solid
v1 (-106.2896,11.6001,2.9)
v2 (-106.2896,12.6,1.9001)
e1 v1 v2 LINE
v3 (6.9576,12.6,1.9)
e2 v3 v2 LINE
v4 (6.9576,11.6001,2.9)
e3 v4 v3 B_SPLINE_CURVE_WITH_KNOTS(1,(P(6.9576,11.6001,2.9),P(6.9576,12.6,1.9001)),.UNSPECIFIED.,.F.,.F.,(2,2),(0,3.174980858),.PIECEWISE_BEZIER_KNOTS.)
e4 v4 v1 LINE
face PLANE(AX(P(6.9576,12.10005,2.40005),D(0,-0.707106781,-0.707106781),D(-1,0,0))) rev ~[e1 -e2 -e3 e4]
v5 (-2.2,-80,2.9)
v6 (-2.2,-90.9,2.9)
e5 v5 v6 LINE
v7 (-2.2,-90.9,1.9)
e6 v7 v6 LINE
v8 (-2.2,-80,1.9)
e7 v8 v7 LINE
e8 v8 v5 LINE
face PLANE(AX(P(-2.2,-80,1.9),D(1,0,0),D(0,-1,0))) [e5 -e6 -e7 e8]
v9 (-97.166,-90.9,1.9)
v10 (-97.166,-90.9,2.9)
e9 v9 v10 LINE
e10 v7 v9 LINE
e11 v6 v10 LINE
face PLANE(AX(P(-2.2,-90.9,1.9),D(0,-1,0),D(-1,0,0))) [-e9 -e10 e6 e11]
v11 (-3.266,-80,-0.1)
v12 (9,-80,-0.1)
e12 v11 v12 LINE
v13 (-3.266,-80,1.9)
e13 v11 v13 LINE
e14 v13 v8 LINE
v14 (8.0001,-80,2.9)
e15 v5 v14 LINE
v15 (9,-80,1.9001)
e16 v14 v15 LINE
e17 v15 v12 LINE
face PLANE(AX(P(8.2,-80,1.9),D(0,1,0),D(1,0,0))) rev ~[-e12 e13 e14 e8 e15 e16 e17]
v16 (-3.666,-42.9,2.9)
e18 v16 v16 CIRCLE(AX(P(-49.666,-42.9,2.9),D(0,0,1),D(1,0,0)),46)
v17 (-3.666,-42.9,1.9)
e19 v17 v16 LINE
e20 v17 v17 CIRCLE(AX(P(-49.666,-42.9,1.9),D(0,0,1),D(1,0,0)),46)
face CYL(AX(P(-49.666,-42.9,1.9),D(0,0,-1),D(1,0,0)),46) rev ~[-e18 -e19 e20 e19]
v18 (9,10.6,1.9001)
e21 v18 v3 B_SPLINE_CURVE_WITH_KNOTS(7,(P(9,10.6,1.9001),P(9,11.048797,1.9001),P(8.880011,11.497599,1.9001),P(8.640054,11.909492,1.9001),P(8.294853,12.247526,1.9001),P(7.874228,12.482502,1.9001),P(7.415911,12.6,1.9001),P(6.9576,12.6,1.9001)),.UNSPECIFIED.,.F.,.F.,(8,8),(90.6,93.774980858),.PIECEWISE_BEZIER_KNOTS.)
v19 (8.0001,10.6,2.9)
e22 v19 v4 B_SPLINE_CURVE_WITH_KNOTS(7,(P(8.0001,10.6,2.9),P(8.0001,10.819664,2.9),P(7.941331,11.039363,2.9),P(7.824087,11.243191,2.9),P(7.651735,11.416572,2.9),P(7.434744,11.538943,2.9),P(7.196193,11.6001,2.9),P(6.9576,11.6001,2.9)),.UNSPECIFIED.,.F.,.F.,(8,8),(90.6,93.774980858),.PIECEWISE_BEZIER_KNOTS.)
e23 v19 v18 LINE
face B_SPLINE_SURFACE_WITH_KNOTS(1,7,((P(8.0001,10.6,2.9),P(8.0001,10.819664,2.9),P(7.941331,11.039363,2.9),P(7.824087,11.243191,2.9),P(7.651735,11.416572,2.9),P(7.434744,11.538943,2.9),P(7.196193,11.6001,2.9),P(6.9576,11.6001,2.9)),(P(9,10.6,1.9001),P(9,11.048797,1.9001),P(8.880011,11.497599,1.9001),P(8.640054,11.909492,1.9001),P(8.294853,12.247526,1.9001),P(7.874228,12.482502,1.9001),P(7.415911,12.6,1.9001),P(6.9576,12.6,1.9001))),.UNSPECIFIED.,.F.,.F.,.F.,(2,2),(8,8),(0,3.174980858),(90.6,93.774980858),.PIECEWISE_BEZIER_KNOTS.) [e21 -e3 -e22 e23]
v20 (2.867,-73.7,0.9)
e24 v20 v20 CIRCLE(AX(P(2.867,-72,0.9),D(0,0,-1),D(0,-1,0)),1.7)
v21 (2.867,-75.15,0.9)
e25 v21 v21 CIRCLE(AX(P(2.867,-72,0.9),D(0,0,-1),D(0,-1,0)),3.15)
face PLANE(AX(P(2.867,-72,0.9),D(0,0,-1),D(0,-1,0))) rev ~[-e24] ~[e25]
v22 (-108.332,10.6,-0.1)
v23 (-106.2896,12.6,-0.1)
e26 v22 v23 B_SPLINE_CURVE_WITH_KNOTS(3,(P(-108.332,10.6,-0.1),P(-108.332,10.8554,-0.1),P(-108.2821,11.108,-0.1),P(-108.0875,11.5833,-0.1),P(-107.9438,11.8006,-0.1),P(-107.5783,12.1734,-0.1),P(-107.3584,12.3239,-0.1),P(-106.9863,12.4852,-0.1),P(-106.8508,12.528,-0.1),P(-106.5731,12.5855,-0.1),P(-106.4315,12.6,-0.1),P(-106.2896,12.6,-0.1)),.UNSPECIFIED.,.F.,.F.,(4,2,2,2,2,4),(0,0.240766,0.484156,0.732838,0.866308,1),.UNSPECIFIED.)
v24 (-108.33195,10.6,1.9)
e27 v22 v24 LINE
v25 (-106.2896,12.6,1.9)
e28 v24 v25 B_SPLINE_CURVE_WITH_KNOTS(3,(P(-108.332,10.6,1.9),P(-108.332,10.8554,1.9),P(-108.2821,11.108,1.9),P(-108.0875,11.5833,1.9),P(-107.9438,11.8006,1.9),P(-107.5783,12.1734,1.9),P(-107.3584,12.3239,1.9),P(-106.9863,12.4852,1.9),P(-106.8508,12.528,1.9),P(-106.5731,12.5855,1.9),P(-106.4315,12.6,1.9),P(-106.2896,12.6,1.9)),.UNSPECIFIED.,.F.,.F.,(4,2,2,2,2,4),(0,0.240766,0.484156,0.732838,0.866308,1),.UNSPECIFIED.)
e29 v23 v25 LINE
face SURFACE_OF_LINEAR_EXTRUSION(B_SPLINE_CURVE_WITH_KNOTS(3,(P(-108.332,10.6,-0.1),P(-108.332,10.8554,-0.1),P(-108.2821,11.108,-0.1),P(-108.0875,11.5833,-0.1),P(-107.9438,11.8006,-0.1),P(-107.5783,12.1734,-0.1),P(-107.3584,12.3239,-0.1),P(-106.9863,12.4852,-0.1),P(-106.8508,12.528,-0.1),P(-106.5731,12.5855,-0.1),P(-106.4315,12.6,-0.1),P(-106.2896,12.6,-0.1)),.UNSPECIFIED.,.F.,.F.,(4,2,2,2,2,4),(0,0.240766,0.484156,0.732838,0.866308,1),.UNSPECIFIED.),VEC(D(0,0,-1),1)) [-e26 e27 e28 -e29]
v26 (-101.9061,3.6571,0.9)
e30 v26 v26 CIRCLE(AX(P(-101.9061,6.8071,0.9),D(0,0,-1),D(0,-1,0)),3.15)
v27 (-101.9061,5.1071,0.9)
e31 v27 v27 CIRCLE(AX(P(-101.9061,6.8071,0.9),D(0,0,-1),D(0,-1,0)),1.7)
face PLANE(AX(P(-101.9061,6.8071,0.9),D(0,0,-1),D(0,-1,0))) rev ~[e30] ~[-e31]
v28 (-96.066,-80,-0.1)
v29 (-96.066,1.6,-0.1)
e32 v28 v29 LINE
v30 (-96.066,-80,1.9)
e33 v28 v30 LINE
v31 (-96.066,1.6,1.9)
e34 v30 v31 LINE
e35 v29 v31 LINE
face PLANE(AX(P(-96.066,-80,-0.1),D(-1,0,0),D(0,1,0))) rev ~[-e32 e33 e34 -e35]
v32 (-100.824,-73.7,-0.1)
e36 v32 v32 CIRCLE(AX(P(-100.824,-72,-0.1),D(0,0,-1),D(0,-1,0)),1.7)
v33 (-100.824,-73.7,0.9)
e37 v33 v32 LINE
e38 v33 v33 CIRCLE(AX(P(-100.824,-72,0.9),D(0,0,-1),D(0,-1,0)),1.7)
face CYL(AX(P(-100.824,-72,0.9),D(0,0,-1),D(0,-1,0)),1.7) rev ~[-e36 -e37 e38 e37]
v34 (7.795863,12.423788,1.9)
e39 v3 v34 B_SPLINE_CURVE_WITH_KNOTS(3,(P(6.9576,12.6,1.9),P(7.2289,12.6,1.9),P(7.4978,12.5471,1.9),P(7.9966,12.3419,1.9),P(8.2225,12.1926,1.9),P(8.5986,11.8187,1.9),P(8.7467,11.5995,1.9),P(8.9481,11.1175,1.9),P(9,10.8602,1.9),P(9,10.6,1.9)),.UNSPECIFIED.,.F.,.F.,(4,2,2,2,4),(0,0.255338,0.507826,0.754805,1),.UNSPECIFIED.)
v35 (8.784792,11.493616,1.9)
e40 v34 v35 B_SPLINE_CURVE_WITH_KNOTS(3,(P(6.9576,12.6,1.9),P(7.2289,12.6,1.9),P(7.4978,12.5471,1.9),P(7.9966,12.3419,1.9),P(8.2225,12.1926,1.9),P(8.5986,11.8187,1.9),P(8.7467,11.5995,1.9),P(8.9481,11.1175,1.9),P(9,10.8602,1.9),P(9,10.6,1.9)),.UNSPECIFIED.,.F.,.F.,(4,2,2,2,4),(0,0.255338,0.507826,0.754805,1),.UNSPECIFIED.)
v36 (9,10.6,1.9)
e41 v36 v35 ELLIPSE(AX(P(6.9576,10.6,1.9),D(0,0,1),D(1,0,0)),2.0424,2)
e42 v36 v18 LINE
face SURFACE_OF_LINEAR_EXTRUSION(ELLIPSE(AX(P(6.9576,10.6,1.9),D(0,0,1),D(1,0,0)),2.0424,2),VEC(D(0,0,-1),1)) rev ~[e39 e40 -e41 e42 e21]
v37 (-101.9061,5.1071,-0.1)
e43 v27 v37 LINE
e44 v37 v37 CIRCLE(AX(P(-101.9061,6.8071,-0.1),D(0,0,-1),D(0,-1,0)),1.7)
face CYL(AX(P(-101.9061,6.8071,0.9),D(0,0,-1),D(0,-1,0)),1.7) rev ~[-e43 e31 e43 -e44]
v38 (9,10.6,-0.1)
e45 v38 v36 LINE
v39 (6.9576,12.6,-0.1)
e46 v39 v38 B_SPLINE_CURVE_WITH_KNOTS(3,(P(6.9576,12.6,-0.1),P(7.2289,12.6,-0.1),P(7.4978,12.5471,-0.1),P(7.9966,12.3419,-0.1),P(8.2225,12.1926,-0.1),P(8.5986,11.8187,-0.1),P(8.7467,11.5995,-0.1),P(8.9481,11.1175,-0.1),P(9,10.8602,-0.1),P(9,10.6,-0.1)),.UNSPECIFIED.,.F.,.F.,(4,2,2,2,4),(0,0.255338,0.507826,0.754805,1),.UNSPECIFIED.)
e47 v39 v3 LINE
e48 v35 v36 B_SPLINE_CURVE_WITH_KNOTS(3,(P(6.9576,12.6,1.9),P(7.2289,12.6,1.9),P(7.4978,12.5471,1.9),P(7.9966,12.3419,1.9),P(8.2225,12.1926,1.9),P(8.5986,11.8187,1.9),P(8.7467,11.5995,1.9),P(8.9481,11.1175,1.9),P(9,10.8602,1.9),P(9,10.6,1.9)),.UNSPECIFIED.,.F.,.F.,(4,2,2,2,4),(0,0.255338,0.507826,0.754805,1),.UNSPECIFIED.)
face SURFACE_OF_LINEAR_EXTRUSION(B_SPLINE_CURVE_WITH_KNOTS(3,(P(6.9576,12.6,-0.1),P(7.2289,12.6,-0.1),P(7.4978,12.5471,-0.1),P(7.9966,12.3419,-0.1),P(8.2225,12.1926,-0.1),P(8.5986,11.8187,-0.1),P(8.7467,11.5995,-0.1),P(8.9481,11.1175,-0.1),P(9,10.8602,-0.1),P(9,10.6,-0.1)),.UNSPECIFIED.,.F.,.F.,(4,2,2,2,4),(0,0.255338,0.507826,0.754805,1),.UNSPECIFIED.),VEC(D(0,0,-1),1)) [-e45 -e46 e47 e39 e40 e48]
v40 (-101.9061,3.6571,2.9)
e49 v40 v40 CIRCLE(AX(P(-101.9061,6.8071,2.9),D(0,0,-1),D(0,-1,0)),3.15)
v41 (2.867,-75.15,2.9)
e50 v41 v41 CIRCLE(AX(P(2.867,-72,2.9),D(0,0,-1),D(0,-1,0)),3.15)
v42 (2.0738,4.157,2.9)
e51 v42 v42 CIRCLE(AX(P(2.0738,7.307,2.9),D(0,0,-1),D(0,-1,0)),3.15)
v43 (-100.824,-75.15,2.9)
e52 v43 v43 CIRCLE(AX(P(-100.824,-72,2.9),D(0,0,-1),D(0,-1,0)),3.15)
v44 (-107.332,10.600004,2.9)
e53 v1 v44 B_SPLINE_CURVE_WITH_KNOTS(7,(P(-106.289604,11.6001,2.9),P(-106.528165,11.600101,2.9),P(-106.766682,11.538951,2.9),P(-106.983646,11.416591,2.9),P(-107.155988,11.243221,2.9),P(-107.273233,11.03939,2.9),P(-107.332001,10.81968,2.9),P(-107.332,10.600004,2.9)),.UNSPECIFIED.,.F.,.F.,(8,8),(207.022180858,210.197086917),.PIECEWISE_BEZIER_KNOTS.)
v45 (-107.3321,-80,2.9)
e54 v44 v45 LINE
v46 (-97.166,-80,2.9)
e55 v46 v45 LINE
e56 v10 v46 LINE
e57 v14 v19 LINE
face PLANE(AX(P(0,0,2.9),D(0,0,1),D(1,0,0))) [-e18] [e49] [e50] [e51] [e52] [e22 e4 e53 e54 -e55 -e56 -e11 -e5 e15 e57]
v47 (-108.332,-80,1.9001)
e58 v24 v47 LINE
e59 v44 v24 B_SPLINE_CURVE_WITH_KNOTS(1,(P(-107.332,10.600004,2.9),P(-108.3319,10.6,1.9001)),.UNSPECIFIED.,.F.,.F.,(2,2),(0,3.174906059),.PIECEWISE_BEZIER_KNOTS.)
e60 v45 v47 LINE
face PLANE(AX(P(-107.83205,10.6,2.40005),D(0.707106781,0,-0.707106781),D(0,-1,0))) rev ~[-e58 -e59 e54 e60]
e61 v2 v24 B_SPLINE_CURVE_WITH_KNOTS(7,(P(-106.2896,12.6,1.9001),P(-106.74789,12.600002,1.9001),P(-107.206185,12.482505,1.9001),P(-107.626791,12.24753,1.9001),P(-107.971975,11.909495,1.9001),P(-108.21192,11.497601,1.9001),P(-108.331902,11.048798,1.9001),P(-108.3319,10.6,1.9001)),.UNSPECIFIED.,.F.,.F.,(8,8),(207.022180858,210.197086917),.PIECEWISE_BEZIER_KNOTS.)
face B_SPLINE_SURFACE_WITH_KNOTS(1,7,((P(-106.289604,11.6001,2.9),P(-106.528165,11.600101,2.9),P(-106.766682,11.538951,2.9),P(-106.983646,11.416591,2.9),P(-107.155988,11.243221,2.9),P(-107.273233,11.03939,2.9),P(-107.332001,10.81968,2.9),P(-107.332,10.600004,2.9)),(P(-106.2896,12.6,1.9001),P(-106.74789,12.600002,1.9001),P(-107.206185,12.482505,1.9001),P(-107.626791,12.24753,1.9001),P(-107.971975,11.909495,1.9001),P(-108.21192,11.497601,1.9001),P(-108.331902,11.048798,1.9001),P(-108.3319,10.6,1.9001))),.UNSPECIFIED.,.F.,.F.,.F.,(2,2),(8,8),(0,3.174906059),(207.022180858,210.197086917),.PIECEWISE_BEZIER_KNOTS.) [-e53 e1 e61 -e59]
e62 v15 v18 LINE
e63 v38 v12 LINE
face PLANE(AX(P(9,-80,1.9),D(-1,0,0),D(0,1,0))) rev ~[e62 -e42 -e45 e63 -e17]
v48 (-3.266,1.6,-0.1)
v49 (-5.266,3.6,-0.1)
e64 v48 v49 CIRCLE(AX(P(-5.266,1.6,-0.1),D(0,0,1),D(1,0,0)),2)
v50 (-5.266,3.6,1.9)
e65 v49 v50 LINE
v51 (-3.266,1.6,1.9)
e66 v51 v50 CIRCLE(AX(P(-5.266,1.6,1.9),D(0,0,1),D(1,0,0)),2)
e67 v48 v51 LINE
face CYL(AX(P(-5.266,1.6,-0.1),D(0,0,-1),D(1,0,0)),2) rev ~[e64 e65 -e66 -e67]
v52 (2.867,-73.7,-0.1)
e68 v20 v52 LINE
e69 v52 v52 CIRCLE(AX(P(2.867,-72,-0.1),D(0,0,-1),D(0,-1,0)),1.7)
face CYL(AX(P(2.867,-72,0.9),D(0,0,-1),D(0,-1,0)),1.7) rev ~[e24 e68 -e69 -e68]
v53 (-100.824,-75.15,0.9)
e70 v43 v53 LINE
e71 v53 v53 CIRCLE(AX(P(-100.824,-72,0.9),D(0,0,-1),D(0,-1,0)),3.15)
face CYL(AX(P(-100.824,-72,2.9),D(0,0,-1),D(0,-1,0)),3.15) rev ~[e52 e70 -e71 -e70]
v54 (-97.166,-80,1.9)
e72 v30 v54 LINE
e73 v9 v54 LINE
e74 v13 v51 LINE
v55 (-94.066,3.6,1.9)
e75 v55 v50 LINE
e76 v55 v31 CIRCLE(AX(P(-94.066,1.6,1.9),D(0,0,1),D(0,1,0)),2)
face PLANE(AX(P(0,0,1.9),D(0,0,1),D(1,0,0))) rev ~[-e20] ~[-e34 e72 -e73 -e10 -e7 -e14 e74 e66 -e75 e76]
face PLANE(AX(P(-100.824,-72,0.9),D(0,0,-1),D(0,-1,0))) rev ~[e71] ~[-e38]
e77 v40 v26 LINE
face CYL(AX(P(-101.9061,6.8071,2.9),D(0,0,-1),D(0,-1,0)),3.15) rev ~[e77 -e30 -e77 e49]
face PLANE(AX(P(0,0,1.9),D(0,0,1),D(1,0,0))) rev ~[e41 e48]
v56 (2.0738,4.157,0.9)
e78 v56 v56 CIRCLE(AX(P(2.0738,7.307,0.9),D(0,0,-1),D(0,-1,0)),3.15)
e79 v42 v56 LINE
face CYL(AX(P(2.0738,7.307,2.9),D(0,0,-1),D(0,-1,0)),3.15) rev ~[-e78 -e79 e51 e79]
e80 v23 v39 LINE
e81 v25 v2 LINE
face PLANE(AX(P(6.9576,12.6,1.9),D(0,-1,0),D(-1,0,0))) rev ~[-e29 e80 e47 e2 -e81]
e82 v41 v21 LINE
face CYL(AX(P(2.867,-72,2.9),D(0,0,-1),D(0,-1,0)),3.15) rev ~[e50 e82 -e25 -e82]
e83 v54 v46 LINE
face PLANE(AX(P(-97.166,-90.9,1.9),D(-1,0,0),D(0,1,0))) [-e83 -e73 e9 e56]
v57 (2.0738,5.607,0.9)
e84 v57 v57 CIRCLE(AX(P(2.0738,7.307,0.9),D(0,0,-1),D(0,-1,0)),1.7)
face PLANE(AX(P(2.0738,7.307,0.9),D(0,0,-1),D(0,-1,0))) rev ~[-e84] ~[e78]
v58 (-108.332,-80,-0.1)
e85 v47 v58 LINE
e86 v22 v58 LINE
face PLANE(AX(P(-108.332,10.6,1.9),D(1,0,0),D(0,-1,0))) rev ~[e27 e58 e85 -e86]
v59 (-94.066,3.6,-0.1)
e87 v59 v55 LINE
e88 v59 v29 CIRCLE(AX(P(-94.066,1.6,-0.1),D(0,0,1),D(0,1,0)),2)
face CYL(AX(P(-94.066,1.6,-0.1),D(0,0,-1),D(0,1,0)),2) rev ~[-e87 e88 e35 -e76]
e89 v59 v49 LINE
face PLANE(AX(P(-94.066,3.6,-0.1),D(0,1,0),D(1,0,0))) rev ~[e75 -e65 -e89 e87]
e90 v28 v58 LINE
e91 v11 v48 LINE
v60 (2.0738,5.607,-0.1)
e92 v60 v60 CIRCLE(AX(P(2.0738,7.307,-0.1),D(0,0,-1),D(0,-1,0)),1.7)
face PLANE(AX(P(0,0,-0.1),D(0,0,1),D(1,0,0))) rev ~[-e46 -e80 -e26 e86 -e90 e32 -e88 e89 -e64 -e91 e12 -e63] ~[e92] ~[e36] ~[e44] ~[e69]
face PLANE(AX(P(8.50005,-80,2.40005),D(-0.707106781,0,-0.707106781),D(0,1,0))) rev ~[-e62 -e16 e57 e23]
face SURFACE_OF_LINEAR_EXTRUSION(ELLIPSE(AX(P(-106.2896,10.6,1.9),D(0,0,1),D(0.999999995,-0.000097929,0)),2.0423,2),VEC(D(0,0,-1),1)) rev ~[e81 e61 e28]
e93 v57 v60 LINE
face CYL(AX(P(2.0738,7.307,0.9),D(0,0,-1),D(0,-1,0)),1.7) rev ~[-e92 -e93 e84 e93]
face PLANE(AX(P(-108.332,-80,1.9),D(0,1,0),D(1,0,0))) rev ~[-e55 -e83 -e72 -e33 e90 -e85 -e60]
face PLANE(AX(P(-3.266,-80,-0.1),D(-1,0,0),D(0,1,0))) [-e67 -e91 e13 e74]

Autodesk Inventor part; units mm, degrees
ref_plane "YZ Plane" through (0, 0, 0) normal (1, 0, 0) x (0, 1, 0)
ref_plane "XZ Plane" through (0, 0, 0) normal (0, 1, 0) x (-1, 0, 0)
ref_plane "XY Plane" through (0, 0, 0) normal (0, 0, 1) x (1, 0, 0)
ref_plane "Work Plane1" through (0, 0, -0.1) normal (0, 0, 1) x (1, 0, 0)
sketch "Sketch1" plane through (0, 0, -0.1) normal (0, 0, 1) x (1, 0, 0)
  circle A0 centre (-100.824, -72) radius 2
  circle A1 centre (2.867, -72) radius 2
  circle A2 centre (-101.9061, 6.8071) radius 2
  circle A3 centre (2.0738, 7.307) radius 2
  spline S0 degree 3 poles (-108.332, 10.6) (-108.332, 10.8554) (-108.2821, 11.108) (-108.0875, 11.5833) (-107.9438, 11.8006) (-107.5783, 12.1734) (-107.3584, 12.3239) (-106.9863, 12.4852) (-106.8508, 12.528) (-106.5731, 12.5855) (-106.4315, 12.6) (-106.2896, 12.6) knots 0 0 0 0 0.240766 0.240766 0.484156 0.484156 0.732838 0.732838 0.866308 0.866308 1 1 1 1
  line L0 (-108.332, 10.6) -> (-108.332, -80)
  line L1 (-96.066, -80) -> (-108.332, -80)
  line L2 (-96.066, -80) -> (-96.066, 1.6)
  arc A4 (-94.066, 3.6) -> (-96.066, 1.6) centre (-94.066, 1.6) ccw
  line L3 (-94.066, 3.6) -> (-5.266, 3.6)
  arc A5 (-3.266, 1.6) -> (-5.266, 3.6) centre (-5.266, 1.6) ccw
  line L4 (-3.266, -80) -> (-3.266, 1.6)
  line L5 (-3.266, -80) -> (9, -80)
  line L6 (9, 10.6) -> (9, -80)
  spline S1 degree 3 poles (6.9576, 12.6) (7.2289, 12.6) (7.4978, 12.5471) (7.9966, 12.3419) (8.2225, 12.1926) (8.5986, 11.8187) (8.7467, 11.5995) (8.9481, 11.1175) (9, 10.8602) (9, 10.6) knots 0 0 0 0 0.255338 0.255338 0.507826 0.507826 0.754805 0.754805 1 1 1 1
  line L7 (-106.2896, 12.6) -> (6.9576, 12.6)
  point P0 (0, 0)
extrude "Extrusion1" add sketch "Sketch1" along normal blind 2 contours A0 | A1 | A2 | A3 | S0 L7 S1 L6 L5 L4 A5 L3 A4 L2 L1 L0
sketch "Sketch2" plane through (0, 0, 1.9) normal (0, 0, 1) x (1, 0, 0)
  line L0 (9, -80) -> (9, 10.6) projected
  ellipse E0 centre (6.9576, 10.6) end of major axis (9, 10.6) minor radius 2 (9, 10.6) -> (6.9576, 12.6) ccw projected
  line L1 (6.9576, 12.6) -> (-106.2896, 12.6) projected
  ellipse E1 centre (-106.2896, 10.6) end of major axis (-104.2473, 10.5998) minor radius 2 (-106.2896, 12.6) -> (-108.332, 10.6) ccw projected
  line L2 (-108.332, 10.6) -> (-108.332, -80) projected
  line L3 (8.2, -80) -> (8.2, 10.6)
  line L4 (6.9576, 11.8) -> (-106.2896, 11.8)
  line L5 (-107.532, 10.6) -> (-107.532, -80)
  circle A0 centre (-49.666, -42.9) radius 0.5 projected
  circle A1 centre (-49.666, -42.9) radius 46
  line L6 (8.2, -80) -> (-2.2, -80)
  line L7 (-2.2, -80) -> (-2.2, -90.9)
  line L8 (-2.2, -90.9) -> (-97.166, -90.9)
  line L9 (-97.166, -90.9) -> (-97.166, -80)
  line L10 (-97.166, -80) -> (-107.532, -80)
  line L11 (-2, -97.7) -> (-2, -80.1) projected
  line L12 (-97.366, -97.7) -> (-97.366, -80.1) projected
  spline S0 degree 4 poles (8.2, 10.6) (8.1999, 10.8352) (8.1361, 11.0703) (7.879, 11.4945) (7.4469, 11.738) (7.2023, 11.8) (6.9576, 11.8) knots 0 0 0 0 0 0.490114 0.490114 1 1 1 1 1
  spline S1 degree 4 poles (-106.2896, 11.8) (-106.5343, 11.8) (-106.7789, 11.738) (-107.211, 11.4945) (-107.4681, 11.0703) (-107.5319, 10.8352) (-107.532, 10.6) knots 0 0 0 0 0 0.509886 0.509886 1 1 1 1 1
  point P0 (0, 0)
  point P1 (-96.066, -80)
  point P2 (-3.266, -80)
  dimension "d2" = 0.8
  dimension "d3" = 92
  dimension "d6" = 48
  dimension "d25" = 0.2
  dimension "d26" = 0.2
extrude "Extrusion2" add sketch "Sketch2" along normal blind 1 contours L6 L7 L8 L9 L10 L5 S1 L4 S0 L3
sketch "Sketch3" plane through (0, 0, 2.9) normal (0, 0, 1) x (1, 0, 0)
  circle A0 centre (2.0738, 7.307) radius 2 construction
  circle A1 centre (2.867, -72) radius 2 construction
  circle A2 centre (-100.824, -72) radius 2 construction
  circle A3 centre (-101.9061, 6.8071) radius 2 construction
  point P0 (0, 0)
hole "Hole1" at (2.0738, 7.307, 2.9) at (-101.9061, 6.8071, 2.9) at (-100.824, -72, 2.9) at (2.867, -72, 2.9) direction (0, 0, -1) diameter 3.4 end through all counterbore diameter 6.3 counterbore depth 2 clearance for "Flat Head Machine Screw" size "M3" standard "Ansi Metric M Profile"
sketch "Sketch4" plane through (0, 0, 1.9) normal (0, 0, 1) x (1, 0, 0)
  line L0 (8.2, 10.6) -> (8.2, -80) projected
  line L1 (8.2, -80) -> (9, -80) projected
  line L2 (9, -80) -> (9, 10.6) projected
  ellipse E0 centre (6.9576, 10.6) end of major axis (9, 10.6) minor radius 2 (9, 10.6) -> (6.9576, 12.6) ccw projected
  line L3 (6.9576, 12.6) -> (-106.2896, 12.6) projected
  ellipse E1 centre (-106.2896, 10.6) end of major axis (-104.2473, 10.5998) minor radius 2 (-106.2896, 12.6) -> (-108.332, 10.6) ccw projected
  line L4 (-108.332, 10.6) -> (-108.332, -80) projected
  line L5 (-108.332, -80) -> (-107.532, -80) projected
  line L6 (-107.532, -80) -> (-107.532, 10.6) projected
  ellipse E2 centre (-106.2908, 10.6011) end of major axis (-105.0496, 10.6165) minor radius 1.1989 (-106.2896, 11.8) -> (-107.532, 10.6) ccw projected
  line L7 (-106.2896, 11.8) -> (6.9576, 11.8) projected
  ellipse E3 centre (6.9588, 10.6011) end of major axis (8.1999, 10.5856) minor radius 1.1989 (8.2, 10.6) -> (6.9576, 11.8) ccw projected
  point P0 (0, 0)
extrude "Extrusion3" add sketch "Sketch4" along normal blind 1
chamfer "Chamfer1" distance 1 angle 45 5 edges at (-49.666, 12.6, 2.9) (-107.7338, 12.0142, 2.9) (-108.332, -34.7, 2.9) (8.4018, 12.0142, 2.9) (9, -34.7, 2.9)
properties part number "BP_FanCover"
